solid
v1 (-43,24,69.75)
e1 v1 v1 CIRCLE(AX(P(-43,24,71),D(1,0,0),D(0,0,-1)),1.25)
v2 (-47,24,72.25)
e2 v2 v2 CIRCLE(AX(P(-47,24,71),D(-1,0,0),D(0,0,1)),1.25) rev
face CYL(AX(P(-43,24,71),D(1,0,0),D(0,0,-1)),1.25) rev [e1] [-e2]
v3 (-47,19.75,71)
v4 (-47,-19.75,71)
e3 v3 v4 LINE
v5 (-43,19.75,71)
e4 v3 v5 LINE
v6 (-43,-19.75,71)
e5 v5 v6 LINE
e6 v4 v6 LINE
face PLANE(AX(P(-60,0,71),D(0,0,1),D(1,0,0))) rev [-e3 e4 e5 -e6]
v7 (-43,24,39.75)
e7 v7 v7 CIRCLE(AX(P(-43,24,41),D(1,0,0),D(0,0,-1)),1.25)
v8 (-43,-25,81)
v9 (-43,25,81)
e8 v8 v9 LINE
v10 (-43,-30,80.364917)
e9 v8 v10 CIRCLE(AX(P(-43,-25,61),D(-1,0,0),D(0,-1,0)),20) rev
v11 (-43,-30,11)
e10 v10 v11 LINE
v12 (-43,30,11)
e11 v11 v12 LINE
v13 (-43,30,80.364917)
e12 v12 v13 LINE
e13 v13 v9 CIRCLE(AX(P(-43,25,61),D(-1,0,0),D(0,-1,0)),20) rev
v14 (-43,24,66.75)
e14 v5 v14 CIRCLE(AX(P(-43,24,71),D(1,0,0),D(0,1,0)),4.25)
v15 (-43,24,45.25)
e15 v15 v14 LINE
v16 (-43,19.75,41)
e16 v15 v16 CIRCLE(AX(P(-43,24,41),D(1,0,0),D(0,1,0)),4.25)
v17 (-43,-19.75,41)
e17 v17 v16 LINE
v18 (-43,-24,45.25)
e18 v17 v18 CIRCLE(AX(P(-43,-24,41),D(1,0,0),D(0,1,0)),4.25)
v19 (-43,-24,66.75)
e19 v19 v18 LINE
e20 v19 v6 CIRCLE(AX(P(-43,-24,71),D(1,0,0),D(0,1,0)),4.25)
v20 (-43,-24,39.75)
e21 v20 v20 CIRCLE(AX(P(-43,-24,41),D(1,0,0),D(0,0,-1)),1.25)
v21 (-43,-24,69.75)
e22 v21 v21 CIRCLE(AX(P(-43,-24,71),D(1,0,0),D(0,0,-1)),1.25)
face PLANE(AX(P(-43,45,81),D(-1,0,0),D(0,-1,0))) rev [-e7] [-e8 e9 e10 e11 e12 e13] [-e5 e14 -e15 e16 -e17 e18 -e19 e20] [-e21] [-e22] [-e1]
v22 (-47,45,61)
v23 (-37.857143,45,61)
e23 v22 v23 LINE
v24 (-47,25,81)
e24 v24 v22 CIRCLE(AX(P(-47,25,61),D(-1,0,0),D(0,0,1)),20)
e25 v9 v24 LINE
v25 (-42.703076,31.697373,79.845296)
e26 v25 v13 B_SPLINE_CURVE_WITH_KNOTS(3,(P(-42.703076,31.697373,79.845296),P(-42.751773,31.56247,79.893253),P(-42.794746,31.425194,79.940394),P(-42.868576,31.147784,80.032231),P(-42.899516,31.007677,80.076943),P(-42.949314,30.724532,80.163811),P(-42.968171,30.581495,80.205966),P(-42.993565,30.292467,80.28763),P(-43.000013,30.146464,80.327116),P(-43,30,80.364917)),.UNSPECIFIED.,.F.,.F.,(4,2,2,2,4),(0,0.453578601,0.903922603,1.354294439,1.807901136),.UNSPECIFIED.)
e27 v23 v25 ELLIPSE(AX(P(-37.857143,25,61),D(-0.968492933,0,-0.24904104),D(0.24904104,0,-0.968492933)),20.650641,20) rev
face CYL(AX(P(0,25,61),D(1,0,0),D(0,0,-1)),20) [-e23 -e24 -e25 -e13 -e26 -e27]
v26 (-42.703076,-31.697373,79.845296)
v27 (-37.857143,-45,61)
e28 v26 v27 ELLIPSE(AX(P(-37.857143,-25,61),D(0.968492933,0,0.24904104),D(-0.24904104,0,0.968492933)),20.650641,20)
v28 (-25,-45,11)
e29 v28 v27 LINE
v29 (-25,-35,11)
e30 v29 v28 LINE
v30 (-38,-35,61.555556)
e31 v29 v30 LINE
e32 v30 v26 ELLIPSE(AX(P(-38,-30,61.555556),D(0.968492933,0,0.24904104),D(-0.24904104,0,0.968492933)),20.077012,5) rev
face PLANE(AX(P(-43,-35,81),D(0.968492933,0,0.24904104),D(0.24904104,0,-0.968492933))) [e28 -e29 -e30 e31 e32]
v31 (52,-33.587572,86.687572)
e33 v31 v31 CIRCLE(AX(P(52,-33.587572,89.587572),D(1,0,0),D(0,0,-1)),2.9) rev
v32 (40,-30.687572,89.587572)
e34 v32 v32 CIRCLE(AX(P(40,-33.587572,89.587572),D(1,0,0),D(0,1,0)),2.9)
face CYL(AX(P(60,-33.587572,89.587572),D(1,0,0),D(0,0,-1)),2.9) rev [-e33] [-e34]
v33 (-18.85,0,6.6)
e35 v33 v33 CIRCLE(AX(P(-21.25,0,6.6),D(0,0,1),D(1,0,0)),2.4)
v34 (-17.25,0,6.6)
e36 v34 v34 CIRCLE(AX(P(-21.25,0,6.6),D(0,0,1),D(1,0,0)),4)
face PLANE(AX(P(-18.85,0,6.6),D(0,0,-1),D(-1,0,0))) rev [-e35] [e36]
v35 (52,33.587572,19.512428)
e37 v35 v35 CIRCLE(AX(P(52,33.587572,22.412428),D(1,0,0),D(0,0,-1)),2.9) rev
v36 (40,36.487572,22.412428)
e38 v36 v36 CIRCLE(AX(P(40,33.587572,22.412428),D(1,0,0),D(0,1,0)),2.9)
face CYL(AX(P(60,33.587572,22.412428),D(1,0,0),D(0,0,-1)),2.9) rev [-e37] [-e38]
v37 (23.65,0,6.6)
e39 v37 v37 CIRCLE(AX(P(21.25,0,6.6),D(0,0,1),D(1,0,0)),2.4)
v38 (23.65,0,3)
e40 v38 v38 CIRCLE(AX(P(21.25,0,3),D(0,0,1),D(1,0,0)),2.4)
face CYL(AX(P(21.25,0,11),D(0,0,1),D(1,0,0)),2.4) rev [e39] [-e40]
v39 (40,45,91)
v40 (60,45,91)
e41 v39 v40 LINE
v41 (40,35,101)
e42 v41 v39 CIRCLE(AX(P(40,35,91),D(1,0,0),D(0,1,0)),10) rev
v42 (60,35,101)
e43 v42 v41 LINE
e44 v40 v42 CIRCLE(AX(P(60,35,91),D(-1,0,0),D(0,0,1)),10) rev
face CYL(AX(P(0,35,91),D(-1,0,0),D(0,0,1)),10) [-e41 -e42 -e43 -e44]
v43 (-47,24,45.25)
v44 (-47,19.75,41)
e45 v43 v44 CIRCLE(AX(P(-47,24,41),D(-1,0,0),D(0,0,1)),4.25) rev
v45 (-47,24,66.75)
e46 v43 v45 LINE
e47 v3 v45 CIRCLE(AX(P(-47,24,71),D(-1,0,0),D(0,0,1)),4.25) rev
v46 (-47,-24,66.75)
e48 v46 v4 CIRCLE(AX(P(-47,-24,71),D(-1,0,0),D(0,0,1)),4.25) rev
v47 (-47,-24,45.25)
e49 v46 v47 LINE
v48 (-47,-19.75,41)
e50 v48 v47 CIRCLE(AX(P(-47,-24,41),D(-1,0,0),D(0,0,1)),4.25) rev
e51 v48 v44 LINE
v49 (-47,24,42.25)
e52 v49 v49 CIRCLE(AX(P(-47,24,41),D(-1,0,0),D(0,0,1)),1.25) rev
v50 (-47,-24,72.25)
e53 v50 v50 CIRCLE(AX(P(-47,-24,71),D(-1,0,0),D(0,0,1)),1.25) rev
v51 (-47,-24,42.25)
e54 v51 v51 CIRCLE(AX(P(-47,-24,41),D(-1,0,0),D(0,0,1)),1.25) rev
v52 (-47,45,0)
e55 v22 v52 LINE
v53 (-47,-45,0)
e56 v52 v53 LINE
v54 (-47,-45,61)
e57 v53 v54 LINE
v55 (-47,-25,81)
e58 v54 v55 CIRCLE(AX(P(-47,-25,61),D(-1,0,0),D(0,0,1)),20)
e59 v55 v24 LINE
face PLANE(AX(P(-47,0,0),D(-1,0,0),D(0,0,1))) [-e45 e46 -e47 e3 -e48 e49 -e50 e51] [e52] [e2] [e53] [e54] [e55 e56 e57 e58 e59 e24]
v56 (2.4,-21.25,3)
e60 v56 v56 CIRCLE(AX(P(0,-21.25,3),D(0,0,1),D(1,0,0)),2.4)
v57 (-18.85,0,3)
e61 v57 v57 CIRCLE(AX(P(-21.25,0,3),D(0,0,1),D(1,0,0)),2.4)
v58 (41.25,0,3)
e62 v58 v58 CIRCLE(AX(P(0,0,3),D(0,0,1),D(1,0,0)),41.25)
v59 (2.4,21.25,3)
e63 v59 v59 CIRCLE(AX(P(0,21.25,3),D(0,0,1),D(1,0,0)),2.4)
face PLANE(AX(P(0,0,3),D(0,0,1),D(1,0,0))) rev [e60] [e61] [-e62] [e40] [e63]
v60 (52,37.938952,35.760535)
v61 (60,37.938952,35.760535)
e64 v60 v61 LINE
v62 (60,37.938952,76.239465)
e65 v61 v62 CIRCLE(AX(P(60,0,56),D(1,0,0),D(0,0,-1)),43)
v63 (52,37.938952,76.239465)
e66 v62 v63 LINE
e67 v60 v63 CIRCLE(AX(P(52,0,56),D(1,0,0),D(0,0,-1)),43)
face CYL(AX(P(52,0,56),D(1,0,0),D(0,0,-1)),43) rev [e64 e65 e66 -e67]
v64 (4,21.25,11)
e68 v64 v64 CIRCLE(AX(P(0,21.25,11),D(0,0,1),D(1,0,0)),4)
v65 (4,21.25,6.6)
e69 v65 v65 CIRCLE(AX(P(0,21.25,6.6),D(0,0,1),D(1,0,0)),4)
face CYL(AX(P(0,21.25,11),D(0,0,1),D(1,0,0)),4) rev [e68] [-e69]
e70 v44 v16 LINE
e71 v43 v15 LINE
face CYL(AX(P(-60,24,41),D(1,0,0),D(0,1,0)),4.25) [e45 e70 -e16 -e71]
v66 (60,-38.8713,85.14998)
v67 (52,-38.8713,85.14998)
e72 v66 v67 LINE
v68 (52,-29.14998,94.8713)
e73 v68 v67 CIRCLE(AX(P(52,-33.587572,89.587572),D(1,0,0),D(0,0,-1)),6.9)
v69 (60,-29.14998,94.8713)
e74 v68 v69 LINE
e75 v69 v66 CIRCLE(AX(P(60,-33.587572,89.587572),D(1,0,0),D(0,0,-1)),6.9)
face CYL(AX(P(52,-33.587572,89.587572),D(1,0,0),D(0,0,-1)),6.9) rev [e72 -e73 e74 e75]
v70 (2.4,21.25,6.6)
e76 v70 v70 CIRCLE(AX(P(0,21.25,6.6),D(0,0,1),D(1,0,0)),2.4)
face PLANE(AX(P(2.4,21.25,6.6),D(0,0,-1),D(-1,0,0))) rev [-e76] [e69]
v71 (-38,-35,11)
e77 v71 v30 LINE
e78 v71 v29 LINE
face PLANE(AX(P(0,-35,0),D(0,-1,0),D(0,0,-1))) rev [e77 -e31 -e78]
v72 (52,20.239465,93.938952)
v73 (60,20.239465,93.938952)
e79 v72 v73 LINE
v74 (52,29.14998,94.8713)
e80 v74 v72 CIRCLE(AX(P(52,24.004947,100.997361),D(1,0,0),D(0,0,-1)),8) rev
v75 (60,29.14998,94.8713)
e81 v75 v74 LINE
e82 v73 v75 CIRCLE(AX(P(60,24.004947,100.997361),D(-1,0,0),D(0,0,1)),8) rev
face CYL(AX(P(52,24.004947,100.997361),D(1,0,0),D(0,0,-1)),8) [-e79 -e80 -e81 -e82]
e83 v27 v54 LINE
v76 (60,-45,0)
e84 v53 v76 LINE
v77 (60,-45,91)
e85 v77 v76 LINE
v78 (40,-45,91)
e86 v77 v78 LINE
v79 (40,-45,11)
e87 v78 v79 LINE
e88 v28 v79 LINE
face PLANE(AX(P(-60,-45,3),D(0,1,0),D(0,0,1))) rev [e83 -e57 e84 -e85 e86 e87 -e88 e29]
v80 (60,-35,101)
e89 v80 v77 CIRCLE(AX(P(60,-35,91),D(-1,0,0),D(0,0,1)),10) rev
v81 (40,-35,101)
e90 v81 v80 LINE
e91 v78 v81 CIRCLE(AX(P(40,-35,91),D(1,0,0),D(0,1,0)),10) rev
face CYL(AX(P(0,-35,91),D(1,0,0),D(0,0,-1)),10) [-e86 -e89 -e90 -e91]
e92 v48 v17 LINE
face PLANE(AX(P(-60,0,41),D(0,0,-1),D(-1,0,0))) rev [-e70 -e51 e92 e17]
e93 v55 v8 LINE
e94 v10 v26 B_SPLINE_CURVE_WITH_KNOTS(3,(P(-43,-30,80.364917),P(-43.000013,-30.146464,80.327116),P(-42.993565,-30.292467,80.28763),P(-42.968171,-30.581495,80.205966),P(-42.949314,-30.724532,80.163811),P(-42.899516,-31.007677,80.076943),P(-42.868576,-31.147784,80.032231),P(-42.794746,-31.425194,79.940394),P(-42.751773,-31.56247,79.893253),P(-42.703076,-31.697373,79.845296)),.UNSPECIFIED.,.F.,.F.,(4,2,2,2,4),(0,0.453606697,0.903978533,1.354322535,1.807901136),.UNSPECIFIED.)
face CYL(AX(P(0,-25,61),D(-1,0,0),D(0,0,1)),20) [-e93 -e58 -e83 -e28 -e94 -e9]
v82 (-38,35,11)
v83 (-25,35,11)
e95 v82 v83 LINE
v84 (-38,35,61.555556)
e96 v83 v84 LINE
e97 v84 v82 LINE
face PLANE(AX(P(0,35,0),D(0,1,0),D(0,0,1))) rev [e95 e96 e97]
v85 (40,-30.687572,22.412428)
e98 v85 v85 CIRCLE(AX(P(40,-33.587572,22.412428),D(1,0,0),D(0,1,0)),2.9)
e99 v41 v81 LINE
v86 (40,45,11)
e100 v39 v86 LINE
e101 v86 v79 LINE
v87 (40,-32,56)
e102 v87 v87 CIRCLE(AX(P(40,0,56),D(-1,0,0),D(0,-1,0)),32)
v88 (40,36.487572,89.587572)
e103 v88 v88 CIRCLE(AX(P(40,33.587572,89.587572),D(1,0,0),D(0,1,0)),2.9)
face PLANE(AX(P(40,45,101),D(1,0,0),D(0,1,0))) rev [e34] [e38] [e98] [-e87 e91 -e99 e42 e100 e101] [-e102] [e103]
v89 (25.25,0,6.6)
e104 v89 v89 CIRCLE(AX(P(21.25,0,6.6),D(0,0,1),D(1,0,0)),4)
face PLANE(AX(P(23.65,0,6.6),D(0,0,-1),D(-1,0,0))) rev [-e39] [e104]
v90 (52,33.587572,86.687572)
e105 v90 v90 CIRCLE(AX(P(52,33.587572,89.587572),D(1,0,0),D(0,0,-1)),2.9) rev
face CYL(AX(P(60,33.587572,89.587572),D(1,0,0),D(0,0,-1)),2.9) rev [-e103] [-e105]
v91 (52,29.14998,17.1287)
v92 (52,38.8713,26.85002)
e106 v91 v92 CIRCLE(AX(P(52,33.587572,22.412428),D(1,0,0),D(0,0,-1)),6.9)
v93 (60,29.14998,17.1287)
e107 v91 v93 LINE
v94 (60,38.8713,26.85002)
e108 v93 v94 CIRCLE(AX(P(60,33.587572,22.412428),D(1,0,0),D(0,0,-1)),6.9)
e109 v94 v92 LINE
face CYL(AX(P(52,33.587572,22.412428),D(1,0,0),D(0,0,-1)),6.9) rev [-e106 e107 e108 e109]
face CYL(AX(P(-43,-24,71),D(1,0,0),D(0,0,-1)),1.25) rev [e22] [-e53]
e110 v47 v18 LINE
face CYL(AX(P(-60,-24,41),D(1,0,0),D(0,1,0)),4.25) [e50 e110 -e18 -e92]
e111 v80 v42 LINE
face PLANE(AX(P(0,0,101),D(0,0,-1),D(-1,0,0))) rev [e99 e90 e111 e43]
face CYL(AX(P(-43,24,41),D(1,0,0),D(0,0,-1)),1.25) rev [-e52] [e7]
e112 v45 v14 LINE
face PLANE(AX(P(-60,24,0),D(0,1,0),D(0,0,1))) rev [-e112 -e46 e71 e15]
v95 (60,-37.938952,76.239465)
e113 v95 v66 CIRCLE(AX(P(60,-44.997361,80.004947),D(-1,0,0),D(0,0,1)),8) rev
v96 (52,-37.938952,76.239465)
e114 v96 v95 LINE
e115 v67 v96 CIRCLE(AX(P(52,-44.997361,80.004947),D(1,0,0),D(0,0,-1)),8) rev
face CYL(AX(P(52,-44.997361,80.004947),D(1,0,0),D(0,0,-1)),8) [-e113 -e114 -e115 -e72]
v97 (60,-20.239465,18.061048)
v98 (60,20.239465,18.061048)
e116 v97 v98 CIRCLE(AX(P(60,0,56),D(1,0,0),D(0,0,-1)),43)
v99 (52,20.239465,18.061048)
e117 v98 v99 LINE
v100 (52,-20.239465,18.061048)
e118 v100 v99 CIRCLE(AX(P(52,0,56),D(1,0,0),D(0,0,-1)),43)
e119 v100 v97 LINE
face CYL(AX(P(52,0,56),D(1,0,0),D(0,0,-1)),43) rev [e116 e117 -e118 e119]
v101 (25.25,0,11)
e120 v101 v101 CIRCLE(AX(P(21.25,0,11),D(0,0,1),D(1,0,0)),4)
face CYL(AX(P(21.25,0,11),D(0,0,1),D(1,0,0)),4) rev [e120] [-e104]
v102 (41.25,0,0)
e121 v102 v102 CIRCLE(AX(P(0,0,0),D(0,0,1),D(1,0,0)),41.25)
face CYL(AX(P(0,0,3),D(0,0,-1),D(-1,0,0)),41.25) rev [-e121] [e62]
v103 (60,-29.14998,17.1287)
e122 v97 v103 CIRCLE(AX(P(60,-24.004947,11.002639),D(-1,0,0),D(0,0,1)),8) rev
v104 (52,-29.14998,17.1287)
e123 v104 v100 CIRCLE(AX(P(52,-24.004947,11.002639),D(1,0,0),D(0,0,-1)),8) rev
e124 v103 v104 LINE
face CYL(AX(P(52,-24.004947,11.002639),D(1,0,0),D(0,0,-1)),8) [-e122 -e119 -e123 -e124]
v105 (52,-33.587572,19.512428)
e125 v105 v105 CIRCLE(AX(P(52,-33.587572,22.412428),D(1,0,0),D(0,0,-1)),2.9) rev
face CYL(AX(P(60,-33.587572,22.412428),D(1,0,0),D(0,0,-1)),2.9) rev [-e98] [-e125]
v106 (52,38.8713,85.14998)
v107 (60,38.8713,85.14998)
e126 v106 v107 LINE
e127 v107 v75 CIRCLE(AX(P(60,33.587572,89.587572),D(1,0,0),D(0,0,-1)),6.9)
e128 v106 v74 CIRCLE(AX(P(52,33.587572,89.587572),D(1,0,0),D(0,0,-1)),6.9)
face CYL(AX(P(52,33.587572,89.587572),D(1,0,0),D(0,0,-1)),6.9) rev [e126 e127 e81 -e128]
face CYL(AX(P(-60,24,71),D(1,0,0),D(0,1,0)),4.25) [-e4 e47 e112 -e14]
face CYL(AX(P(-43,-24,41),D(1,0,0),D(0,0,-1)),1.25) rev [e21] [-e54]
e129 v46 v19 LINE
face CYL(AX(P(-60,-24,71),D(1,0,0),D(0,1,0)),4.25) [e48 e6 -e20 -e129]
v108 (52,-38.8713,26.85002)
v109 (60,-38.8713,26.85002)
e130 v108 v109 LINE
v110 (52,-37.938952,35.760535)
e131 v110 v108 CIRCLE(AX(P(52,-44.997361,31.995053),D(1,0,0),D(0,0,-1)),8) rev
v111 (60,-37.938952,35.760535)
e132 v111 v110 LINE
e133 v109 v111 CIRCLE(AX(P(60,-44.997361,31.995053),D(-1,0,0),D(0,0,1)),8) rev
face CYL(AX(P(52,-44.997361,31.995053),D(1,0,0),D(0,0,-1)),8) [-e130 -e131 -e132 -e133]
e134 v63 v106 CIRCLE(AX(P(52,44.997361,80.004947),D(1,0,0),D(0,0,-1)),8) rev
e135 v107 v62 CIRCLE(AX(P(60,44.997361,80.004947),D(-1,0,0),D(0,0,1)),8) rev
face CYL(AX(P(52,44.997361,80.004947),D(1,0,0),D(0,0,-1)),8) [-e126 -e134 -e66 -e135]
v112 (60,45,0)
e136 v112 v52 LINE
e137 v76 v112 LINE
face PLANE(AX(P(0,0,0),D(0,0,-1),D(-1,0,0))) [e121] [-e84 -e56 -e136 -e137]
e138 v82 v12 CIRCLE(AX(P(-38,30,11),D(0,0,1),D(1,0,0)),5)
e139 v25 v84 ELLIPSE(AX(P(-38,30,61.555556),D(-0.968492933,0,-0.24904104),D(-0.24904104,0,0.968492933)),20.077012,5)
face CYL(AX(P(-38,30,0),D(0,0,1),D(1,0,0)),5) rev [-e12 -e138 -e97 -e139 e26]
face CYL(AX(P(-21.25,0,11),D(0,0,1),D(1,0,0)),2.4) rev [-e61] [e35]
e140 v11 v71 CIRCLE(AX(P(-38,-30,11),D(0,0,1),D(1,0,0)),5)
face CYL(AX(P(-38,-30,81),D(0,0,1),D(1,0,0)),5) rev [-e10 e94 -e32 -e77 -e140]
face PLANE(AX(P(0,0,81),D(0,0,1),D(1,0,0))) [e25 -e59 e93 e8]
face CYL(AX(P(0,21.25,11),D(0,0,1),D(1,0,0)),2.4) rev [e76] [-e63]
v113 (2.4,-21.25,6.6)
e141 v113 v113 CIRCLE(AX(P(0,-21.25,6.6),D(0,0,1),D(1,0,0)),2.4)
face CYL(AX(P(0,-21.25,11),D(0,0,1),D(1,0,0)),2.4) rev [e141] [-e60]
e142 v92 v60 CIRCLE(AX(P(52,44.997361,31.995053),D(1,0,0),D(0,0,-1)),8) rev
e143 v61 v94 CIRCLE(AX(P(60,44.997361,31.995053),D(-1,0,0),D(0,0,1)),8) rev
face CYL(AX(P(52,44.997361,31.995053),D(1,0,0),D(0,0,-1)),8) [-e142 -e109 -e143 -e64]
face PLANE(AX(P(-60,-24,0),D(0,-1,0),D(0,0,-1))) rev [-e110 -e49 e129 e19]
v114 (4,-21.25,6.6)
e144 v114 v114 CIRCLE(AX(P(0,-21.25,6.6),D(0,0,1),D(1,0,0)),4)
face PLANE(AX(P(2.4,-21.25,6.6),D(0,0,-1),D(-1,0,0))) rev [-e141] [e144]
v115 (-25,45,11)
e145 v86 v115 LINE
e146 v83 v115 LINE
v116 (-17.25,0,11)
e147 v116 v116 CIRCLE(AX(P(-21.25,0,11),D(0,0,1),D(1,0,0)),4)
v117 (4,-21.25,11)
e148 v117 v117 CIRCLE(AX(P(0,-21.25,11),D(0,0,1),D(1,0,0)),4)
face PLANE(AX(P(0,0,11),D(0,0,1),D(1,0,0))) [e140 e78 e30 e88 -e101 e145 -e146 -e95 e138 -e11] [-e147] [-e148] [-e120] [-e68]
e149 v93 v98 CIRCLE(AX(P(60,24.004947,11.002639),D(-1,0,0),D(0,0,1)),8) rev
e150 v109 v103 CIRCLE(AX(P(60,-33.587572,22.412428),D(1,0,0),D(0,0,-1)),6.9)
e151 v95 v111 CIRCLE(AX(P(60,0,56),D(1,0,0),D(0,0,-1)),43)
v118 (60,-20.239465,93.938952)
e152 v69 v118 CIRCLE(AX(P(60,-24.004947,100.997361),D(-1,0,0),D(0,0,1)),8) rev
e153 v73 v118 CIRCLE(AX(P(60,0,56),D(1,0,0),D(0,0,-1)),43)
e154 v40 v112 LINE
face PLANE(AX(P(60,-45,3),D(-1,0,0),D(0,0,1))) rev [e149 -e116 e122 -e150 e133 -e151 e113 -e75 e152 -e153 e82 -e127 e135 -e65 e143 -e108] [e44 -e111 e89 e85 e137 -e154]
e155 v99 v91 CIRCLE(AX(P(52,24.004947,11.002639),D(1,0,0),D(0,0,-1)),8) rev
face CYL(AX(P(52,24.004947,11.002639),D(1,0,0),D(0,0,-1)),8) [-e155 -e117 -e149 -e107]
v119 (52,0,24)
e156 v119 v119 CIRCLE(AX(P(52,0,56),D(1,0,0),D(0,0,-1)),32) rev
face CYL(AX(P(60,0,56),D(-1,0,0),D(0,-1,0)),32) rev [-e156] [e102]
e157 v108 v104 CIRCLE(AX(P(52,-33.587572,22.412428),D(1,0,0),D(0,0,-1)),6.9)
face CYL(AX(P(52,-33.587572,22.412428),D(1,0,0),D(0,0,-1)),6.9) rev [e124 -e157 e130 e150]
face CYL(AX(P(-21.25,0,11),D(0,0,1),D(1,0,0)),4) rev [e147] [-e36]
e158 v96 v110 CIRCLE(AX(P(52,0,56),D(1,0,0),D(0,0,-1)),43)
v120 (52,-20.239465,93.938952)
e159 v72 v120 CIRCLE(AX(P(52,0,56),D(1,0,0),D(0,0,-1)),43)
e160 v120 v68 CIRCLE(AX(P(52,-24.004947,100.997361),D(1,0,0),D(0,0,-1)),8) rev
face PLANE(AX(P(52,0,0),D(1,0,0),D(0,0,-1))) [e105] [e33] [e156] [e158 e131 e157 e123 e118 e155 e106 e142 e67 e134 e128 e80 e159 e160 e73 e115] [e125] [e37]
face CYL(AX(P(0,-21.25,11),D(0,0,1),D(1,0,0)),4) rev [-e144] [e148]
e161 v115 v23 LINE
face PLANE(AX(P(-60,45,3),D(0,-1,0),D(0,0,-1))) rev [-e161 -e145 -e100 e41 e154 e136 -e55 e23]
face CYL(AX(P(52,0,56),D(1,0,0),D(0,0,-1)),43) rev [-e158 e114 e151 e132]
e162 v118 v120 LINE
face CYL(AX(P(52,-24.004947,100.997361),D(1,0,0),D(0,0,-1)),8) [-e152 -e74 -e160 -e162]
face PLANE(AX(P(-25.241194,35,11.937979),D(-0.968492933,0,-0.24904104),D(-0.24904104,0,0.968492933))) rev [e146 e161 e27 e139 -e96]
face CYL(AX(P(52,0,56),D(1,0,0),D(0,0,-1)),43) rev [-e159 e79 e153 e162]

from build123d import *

# Parameters (mm, degrees)
SKETCH1_W                                           = 120
SKETCH1_H                                           = 90
SKETCH1_R                                           = 41.25
BOSS_EXTRUDE1_DEPTH                                 = 3
SKETCH2_W                                           = 120
SKETCH2_H                                           = 90
BOSS_EXTRUDE2_DEPTH                                 = 8
CBORE_FOR_M4_HEX_SOCKET_HEAD_CAP_SCREW1_D           = 4.8
CBORE_FOR_M4_HEX_SOCKET_HEAD_CAP_SCREW1_CBORE_D     = 8
CBORE_FOR_M4_HEX_SOCKET_HEAD_CAP_SCREW1_CBORE_DEPTH = 4.4
SKETCH5_W                                           = 20
SKETCH5_H                                           = 90
BOSS_EXTRUDE3_DEPTH                                 = 90
SKETCH8_R                                           = 32
CUT_EXTRUDE3_DEPTH                                  = 150.083869013
M5_CLEARANCE_HOLE1_D                                = 5.8
CUT_EXTRUDE4_START                                  = -8
SKETCH13_R                                          = 43
SKETCH13_R_2                                        = 6.9
SKETCH13_R_3                                        = 2.9
SKETCH13_R_4                                        = 32
CUT_EXTRUDE4_DEPTH                                  = 8
FILLET1_R                                           = 8
SKETCH14_W                                          = 17
SKETCH14_H                                          = 90
BOSS_EXTRUDE4_DEPTH                                 = 70
TAP_DRILL_FOR_M3_TAP2_D                             = 2.5
CUT_EXTRUDE5_DEPTH                                  = 152.112541008
SKETCH21_W                                          = 81
SKETCH21_H                                          = 90
CUT_EXTRUDE6_DEPTH                                  = 13
BOSS_EXTRUDE5_DEPTH                                 = 10
BOSS_EXTRUDE6_START                                 = -90
BOSS_EXTRUDE6_DEPTH                                 = 10
FILLET3_R                                           = 5
FILLET2_R                                           = 20
FILLET4_R                                           = 10


with BuildPart() as part:
    # Sketch1 → Boss-Extrude1 (new body)
    with BuildSketch(Plane.XY):
        Rectangle(SKETCH1_W, SKETCH1_H)
        Circle(SKETCH1_R, mode=Mode.SUBTRACT)
    extrude(amount=BOSS_EXTRUDE1_DEPTH)

    # Sketch2 → Boss-Extrude2 (add)
    with BuildSketch(Plane.XY.offset(3)):
        Rectangle(SKETCH2_W, SKETCH2_H)
    extrude(amount=BOSS_EXTRUDE2_DEPTH)

    # CBORE for M4 Hex Socket Head Cap Screw1 (through all)
    with Locations(Plane.XY.offset(11)):
        with Locations((-21.25, 0), (0, 21.25), (21.25, 0), (0, -21.25)):
            CounterBoreHole(CBORE_FOR_M4_HEX_SOCKET_HEAD_CAP_SCREW1_D / 2, CBORE_FOR_M4_HEX_SOCKET_HEAD_CAP_SCREW1_CBORE_D / 2, CBORE_FOR_M4_HEX_SOCKET_HEAD_CAP_SCREW1_CBORE_DEPTH)

    # Sketch5 → Boss-Extrude3 (add)
    with BuildSketch(Plane.XY.offset(11)):
        with Locations((50, 0)):
            Rectangle(SKETCH5_W, SKETCH5_H)
    extrude(amount=BOSS_EXTRUDE3_DEPTH)

    # Sketch8 → Cut-Extrude3 (cut, through all)
    with BuildSketch(Plane.ZY.offset(-40)):
        with Locations(Location((56, 0, 0), (0, 0, 270))):
            Circle(SKETCH8_R)
    extrude(amount=-CUT_EXTRUDE3_DEPTH, mode=Mode.SUBTRACT)

    # M5 Clearance Hole1 (through all)
    with Locations(Plane(origin=(60, 0, 0), x_dir=(0, 0, -1), z_dir=(1, 0, 0))):
        with Locations((-22.412427894, -33.587572106), (-89.587572106, -33.587572106), (-89.587572106, 33.587572106), (-22.412427894, 33.587572106)):
            Hole(M5_CLEARANCE_HOLE1_D / 2)

    # Sketch13 → Cut-Extrude4 (cut)
    # profile 1 of 22: a face of its own
    with BuildSketch(Plane(origin=(60, 0, 0), x_dir=(0, 0, -1), z_dir=(1, 0, 0)).offset(CUT_EXTRUDE4_START)):
        with Locations((-56, 0)):
            Circle(SKETCH13_R)
    # profile 2 of 22: a face of its own
    with BuildSketch(Plane(origin=(60, 0, 0), x_dir=(0, 0, -1), z_dir=(1, 0, 0)).offset(CUT_EXTRUDE4_START)):
        with Locations((-89.587572106, 33.587572106)):
            Circle(SKETCH13_R_2)
        with Locations((-89.587572106, 33.587572106)):
            Circle(SKETCH13_R_3, mode=Mode.SUBTRACT)
    # profile 3 of 22: a face of its own
    with BuildSketch(Plane(origin=(60, 0, 0), x_dir=(0, 0, -1), z_dir=(1, 0, 0)).offset(CUT_EXTRUDE4_START)):
        with Locations((-56, 0)):
            Circle(SKETCH13_R)
    # profile 4 of 22: a face of its own
    with BuildSketch(Plane(origin=(60, 0, 0), x_dir=(0, 0, -1), z_dir=(1, 0, 0)).offset(CUT_EXTRUDE4_START)):
        with Locations((-89.587572106, 33.587572106)):
            Circle(SKETCH13_R_2)
    # profile 5 of 22: a face of its own
    with BuildSketch(Plane(origin=(60, 0, 0), x_dir=(0, 0, -1), z_dir=(1, 0, 0)).offset(CUT_EXTRUDE4_START)):
        with Locations((-22.412427894, 33.587572106)):
            Circle(SKETCH13_R_2)
    # profile 6 of 22: a face of its own
    with BuildSketch(Plane(origin=(60, 0, 0), x_dir=(0, 0, -1), z_dir=(1, 0, 0)).offset(CUT_EXTRUDE4_START)):
        with Locations((-56, 0)):
            Circle(SKETCH13_R)
        with Locations(Location((-56, 0, 0), (0, 0, 270))):
            Circle(SKETCH13_R_4, mode=Mode.SUBTRACT)
    # profile 7 of 22: a face of its own
    with BuildSketch(Plane(origin=(60, 0, 0), x_dir=(0, 0, -1), z_dir=(1, 0, 0)).offset(CUT_EXTRUDE4_START)):
        with Locations((-89.587572106, 33.587572106)):
            Circle(SKETCH13_R_2)
    # profile 8 of 22: a face of its own
    with BuildSketch(Plane(origin=(60, 0, 0), x_dir=(0, 0, -1), z_dir=(1, 0, 0)).offset(CUT_EXTRUDE4_START)):
        with Locations((-89.587572106, -33.587572106)):
            Circle(SKETCH13_R_2)
    # profile 9 of 22: a face of its own
    with BuildSketch(Plane(origin=(60, 0, 0), x_dir=(0, 0, -1), z_dir=(1, 0, 0)).offset(CUT_EXTRUDE4_START)):
        with Locations((-22.412427894, -33.587572106)):
            Circle(SKETCH13_R_2)
    # profile 10 of 22: a face of its own
    with BuildSketch(Plane(origin=(60, 0, 0), x_dir=(0, 0, -1), z_dir=(1, 0, 0)).offset(CUT_EXTRUDE4_START)):
        with Locations((-56, 0)):
            Circle(SKETCH13_R)
    # profile 11 of 22: a face of its own
    with BuildSketch(Plane(origin=(60, 0, 0), x_dir=(0, 0, -1), z_dir=(1, 0, 0)).offset(CUT_EXTRUDE4_START)):
        with Locations((-22.412427894, 33.587572106)):
            Circle(SKETCH13_R_2)
    # profile 12 of 22: a face of its own
    with BuildSketch(Plane(origin=(60, 0, 0), x_dir=(0, 0, -1), z_dir=(1, 0, 0)).offset(CUT_EXTRUDE4_START)):
        with Locations((-56, 0)):
            Circle(SKETCH13_R)
    # profile 13 of 22: a face of its own
    with BuildSketch(Plane(origin=(60, 0, 0), x_dir=(0, 0, -1), z_dir=(1, 0, 0)).offset(CUT_EXTRUDE4_START)):
        with Locations((-22.412427894, 33.587572106)):
            Circle(SKETCH13_R_2)
        with Locations((-22.412427894, 33.587572106)):
            Circle(SKETCH13_R_3, mode=Mode.SUBTRACT)
    # profile 14 of 22: a face of its own
    with BuildSketch(Plane(origin=(60, 0, 0), x_dir=(0, 0, -1), z_dir=(1, 0, 0)).offset(CUT_EXTRUDE4_START)):
        with Locations((-56, 0)):
            Circle(SKETCH13_R)
    # profile 15 of 22: a face of its own
    with BuildSketch(Plane(origin=(60, 0, 0), x_dir=(0, 0, -1), z_dir=(1, 0, 0)).offset(CUT_EXTRUDE4_START)):
        with Locations((-22.412427894, -33.587572106)):
            Circle(SKETCH13_R_2)
    # profile 16 of 22: a face of its own
    with BuildSketch(Plane(origin=(60, 0, 0), x_dir=(0, 0, -1), z_dir=(1, 0, 0)).offset(CUT_EXTRUDE4_START)):
        with Locations((-56, 0)):
            Circle(SKETCH13_R)
    # profile 17 of 22: a face of its own
    with BuildSketch(Plane(origin=(60, 0, 0), x_dir=(0, 0, -1), z_dir=(1, 0, 0)).offset(CUT_EXTRUDE4_START)):
        with Locations((-22.412427894, -33.587572106)):
            Circle(SKETCH13_R_2)
        with Locations((-22.412427894, -33.587572106)):
            Circle(SKETCH13_R_3, mode=Mode.SUBTRACT)
    # profile 18 of 22: a face of its own
    with BuildSketch(Plane(origin=(60, 0, 0), x_dir=(0, 0, -1), z_dir=(1, 0, 0)).offset(CUT_EXTRUDE4_START)):
        with Locations((-56, 0)):
            Circle(SKETCH13_R)
    # profile 19 of 22: a face of its own
    with BuildSketch(Plane(origin=(60, 0, 0), x_dir=(0, 0, -1), z_dir=(1, 0, 0)).offset(CUT_EXTRUDE4_START)):
        with Locations((-89.587572106, -33.587572106)):
            Circle(SKETCH13_R_2)
    # profile 20 of 22: a face of its own
    with BuildSketch(Plane(origin=(60, 0, 0), x_dir=(0, 0, -1), z_dir=(1, 0, 0)).offset(CUT_EXTRUDE4_START)):
        with Locations((-56, 0)):
            Circle(SKETCH13_R)
    # profile 21 of 22: a face of its own
    with BuildSketch(Plane(origin=(60, 0, 0), x_dir=(0, 0, -1), z_dir=(1, 0, 0)).offset(CUT_EXTRUDE4_START)):
        with Locations((-89.587572106, -33.587572106)):
            Circle(SKETCH13_R_2)
        with Locations((-89.587572106, -33.587572106)):
            Circle(SKETCH13_R_3, mode=Mode.SUBTRACT)
    # profile 22 of 22: a face of its own
    with BuildSketch(Plane(origin=(60, 0, 0), x_dir=(0, 0, -1), z_dir=(1, 0, 0)).offset(CUT_EXTRUDE4_START)):
        with Locations((-22.412427894, -33.587572106)):
            Circle(SKETCH13_R_3)
    extrude(amount=CUT_EXTRUDE4_DEPTH, mode=Mode.SUBTRACT)

    # Fillet1
    fillet1_edges = [part.edges().sort_by_distance(p)[0] for p in [
        (56, 26.688751419, 89.715138257),
        (56, 33.715138257, 82.688751419),
        (56, 33.715138257, 29.311248581),
        (56, 26.688751419, 22.284861743),
        (56, -26.688751419, 22.284861743),
        (56, -33.715138257, 29.311248581),
        (56, -33.715138257, 82.688751419),
        (56, -26.688751419, 89.715138257),
    ]]
    fillet(fillet1_edges, radius=FILLET1_R)

    # Sketch14 → Boss-Extrude4 (add)
    with BuildSketch(Plane.XY.offset(11)):
        with Locations((-51.5, 0)):
            Rectangle(SKETCH14_W, SKETCH14_H)
    extrude(amount=BOSS_EXTRUDE4_DEPTH)

    # Tap Drill for M3 Tap2 (through all)
    with Locations(Plane(origin=(-43, 0, 0), x_dir=(0, 0, -1), z_dir=(1, 0, 0))):
        with Locations((-71, -24), (-71, 24), (-41, -24), (-41, 24)):
            Hole(TAP_DRILL_FOR_M3_TAP2_D / 2)

    # Sketch20 → Cut-Extrude5 (cut, through all)
    with BuildSketch(Plane(origin=(-43, 0, 0), x_dir=(0, 0, -1), z_dir=(1, 0, 0))):
        with BuildLine():
            ThreePointArc((-66.75, 24), (-67.99479618, 20.99479618), (-71, 19.75))
            Line((-71, 19.75), (-71, -19.75))
            ThreePointArc((-71, -19.75), (-67.99479618, -20.99479618), (-66.75, -24))
            Line((-66.75, -24), (-45.25, -24))
            ThreePointArc((-45.25, -24), (-44.00520382, -20.99479618), (-41, -19.75))
            Line((-41, -19.75), (-41, 19.75))
            ThreePointArc((-41, 19.75), (-44.00520382, 20.99479618), (-45.25, 24))
            Line((-45.25, 24), (-66.75, 24))
        make_face()
    extrude(amount=-CUT_EXTRUDE5_DEPTH, mode=Mode.SUBTRACT)

    # Sketch21 → Cut-Extrude6 (cut)
    with BuildSketch(Plane.ZY.offset(60)):
        with Locations((40.5, 0)):
            Rectangle(SKETCH21_W, SKETCH21_H)
    extrude(amount=-CUT_EXTRUDE6_DEPTH, mode=Mode.SUBTRACT)

    # Sketch22 → Boss-Extrude5 (add)
    with BuildSketch(Plane.XZ.offset(45)):
        Polygon((-43, 81), (-25, 11), (-43, 11), align=None)
    extrude(amount=-BOSS_EXTRUDE5_DEPTH)

    # Sketch22<2> → Boss-Extrude6 (add)
    with BuildSketch(Plane.XZ.offset(45).offset(BOSS_EXTRUDE6_START)):
        Polygon((-43, 81), (-25, 11), (-43, 11), align=None)
    extrude(amount=BOSS_EXTRUDE6_DEPTH)

    # Fillet3
    fillet3_edges = [part.edges().sort_by_distance(p)[0] for p in [
        (-43, -35, 46),
        (-43, 35, 46),
    ]]
    fillet(fillet3_edges, radius=FILLET3_R)

    # Fillet2
    # the kernel refuses this fillet: 20 mm, written as the material it takes off along each edge
    with BuildSketch(Plane(origin=(-97, 45, 81), x_dir=(0, -1, 0), z_dir=(1, 0, 0)), Plane(origin=(7, -45, 81), x_dir=(0, 1, 0), z_dir=(-1, 0, 0))) as fillet2_piece_1:
        with BuildLine():
            CenterArc((FILLET2_R, FILLET2_R), FILLET2_R, 180, 90)
            Line((0, FILLET2_R), (0, 0))
            Line((0, 0), (FILLET2_R, 0))
        make_face()
    extrude(amount=104, mode=Mode.SUBTRACT)

    # Fillet4
    fillet4_edges = [part.edges().sort_by_distance(p)[0] for p in [
        (50, 45, 101),
        (50, -45, 101),
    ]]
    fillet(fillet4_edges, radius=FILLET4_R)


solid = part.part
